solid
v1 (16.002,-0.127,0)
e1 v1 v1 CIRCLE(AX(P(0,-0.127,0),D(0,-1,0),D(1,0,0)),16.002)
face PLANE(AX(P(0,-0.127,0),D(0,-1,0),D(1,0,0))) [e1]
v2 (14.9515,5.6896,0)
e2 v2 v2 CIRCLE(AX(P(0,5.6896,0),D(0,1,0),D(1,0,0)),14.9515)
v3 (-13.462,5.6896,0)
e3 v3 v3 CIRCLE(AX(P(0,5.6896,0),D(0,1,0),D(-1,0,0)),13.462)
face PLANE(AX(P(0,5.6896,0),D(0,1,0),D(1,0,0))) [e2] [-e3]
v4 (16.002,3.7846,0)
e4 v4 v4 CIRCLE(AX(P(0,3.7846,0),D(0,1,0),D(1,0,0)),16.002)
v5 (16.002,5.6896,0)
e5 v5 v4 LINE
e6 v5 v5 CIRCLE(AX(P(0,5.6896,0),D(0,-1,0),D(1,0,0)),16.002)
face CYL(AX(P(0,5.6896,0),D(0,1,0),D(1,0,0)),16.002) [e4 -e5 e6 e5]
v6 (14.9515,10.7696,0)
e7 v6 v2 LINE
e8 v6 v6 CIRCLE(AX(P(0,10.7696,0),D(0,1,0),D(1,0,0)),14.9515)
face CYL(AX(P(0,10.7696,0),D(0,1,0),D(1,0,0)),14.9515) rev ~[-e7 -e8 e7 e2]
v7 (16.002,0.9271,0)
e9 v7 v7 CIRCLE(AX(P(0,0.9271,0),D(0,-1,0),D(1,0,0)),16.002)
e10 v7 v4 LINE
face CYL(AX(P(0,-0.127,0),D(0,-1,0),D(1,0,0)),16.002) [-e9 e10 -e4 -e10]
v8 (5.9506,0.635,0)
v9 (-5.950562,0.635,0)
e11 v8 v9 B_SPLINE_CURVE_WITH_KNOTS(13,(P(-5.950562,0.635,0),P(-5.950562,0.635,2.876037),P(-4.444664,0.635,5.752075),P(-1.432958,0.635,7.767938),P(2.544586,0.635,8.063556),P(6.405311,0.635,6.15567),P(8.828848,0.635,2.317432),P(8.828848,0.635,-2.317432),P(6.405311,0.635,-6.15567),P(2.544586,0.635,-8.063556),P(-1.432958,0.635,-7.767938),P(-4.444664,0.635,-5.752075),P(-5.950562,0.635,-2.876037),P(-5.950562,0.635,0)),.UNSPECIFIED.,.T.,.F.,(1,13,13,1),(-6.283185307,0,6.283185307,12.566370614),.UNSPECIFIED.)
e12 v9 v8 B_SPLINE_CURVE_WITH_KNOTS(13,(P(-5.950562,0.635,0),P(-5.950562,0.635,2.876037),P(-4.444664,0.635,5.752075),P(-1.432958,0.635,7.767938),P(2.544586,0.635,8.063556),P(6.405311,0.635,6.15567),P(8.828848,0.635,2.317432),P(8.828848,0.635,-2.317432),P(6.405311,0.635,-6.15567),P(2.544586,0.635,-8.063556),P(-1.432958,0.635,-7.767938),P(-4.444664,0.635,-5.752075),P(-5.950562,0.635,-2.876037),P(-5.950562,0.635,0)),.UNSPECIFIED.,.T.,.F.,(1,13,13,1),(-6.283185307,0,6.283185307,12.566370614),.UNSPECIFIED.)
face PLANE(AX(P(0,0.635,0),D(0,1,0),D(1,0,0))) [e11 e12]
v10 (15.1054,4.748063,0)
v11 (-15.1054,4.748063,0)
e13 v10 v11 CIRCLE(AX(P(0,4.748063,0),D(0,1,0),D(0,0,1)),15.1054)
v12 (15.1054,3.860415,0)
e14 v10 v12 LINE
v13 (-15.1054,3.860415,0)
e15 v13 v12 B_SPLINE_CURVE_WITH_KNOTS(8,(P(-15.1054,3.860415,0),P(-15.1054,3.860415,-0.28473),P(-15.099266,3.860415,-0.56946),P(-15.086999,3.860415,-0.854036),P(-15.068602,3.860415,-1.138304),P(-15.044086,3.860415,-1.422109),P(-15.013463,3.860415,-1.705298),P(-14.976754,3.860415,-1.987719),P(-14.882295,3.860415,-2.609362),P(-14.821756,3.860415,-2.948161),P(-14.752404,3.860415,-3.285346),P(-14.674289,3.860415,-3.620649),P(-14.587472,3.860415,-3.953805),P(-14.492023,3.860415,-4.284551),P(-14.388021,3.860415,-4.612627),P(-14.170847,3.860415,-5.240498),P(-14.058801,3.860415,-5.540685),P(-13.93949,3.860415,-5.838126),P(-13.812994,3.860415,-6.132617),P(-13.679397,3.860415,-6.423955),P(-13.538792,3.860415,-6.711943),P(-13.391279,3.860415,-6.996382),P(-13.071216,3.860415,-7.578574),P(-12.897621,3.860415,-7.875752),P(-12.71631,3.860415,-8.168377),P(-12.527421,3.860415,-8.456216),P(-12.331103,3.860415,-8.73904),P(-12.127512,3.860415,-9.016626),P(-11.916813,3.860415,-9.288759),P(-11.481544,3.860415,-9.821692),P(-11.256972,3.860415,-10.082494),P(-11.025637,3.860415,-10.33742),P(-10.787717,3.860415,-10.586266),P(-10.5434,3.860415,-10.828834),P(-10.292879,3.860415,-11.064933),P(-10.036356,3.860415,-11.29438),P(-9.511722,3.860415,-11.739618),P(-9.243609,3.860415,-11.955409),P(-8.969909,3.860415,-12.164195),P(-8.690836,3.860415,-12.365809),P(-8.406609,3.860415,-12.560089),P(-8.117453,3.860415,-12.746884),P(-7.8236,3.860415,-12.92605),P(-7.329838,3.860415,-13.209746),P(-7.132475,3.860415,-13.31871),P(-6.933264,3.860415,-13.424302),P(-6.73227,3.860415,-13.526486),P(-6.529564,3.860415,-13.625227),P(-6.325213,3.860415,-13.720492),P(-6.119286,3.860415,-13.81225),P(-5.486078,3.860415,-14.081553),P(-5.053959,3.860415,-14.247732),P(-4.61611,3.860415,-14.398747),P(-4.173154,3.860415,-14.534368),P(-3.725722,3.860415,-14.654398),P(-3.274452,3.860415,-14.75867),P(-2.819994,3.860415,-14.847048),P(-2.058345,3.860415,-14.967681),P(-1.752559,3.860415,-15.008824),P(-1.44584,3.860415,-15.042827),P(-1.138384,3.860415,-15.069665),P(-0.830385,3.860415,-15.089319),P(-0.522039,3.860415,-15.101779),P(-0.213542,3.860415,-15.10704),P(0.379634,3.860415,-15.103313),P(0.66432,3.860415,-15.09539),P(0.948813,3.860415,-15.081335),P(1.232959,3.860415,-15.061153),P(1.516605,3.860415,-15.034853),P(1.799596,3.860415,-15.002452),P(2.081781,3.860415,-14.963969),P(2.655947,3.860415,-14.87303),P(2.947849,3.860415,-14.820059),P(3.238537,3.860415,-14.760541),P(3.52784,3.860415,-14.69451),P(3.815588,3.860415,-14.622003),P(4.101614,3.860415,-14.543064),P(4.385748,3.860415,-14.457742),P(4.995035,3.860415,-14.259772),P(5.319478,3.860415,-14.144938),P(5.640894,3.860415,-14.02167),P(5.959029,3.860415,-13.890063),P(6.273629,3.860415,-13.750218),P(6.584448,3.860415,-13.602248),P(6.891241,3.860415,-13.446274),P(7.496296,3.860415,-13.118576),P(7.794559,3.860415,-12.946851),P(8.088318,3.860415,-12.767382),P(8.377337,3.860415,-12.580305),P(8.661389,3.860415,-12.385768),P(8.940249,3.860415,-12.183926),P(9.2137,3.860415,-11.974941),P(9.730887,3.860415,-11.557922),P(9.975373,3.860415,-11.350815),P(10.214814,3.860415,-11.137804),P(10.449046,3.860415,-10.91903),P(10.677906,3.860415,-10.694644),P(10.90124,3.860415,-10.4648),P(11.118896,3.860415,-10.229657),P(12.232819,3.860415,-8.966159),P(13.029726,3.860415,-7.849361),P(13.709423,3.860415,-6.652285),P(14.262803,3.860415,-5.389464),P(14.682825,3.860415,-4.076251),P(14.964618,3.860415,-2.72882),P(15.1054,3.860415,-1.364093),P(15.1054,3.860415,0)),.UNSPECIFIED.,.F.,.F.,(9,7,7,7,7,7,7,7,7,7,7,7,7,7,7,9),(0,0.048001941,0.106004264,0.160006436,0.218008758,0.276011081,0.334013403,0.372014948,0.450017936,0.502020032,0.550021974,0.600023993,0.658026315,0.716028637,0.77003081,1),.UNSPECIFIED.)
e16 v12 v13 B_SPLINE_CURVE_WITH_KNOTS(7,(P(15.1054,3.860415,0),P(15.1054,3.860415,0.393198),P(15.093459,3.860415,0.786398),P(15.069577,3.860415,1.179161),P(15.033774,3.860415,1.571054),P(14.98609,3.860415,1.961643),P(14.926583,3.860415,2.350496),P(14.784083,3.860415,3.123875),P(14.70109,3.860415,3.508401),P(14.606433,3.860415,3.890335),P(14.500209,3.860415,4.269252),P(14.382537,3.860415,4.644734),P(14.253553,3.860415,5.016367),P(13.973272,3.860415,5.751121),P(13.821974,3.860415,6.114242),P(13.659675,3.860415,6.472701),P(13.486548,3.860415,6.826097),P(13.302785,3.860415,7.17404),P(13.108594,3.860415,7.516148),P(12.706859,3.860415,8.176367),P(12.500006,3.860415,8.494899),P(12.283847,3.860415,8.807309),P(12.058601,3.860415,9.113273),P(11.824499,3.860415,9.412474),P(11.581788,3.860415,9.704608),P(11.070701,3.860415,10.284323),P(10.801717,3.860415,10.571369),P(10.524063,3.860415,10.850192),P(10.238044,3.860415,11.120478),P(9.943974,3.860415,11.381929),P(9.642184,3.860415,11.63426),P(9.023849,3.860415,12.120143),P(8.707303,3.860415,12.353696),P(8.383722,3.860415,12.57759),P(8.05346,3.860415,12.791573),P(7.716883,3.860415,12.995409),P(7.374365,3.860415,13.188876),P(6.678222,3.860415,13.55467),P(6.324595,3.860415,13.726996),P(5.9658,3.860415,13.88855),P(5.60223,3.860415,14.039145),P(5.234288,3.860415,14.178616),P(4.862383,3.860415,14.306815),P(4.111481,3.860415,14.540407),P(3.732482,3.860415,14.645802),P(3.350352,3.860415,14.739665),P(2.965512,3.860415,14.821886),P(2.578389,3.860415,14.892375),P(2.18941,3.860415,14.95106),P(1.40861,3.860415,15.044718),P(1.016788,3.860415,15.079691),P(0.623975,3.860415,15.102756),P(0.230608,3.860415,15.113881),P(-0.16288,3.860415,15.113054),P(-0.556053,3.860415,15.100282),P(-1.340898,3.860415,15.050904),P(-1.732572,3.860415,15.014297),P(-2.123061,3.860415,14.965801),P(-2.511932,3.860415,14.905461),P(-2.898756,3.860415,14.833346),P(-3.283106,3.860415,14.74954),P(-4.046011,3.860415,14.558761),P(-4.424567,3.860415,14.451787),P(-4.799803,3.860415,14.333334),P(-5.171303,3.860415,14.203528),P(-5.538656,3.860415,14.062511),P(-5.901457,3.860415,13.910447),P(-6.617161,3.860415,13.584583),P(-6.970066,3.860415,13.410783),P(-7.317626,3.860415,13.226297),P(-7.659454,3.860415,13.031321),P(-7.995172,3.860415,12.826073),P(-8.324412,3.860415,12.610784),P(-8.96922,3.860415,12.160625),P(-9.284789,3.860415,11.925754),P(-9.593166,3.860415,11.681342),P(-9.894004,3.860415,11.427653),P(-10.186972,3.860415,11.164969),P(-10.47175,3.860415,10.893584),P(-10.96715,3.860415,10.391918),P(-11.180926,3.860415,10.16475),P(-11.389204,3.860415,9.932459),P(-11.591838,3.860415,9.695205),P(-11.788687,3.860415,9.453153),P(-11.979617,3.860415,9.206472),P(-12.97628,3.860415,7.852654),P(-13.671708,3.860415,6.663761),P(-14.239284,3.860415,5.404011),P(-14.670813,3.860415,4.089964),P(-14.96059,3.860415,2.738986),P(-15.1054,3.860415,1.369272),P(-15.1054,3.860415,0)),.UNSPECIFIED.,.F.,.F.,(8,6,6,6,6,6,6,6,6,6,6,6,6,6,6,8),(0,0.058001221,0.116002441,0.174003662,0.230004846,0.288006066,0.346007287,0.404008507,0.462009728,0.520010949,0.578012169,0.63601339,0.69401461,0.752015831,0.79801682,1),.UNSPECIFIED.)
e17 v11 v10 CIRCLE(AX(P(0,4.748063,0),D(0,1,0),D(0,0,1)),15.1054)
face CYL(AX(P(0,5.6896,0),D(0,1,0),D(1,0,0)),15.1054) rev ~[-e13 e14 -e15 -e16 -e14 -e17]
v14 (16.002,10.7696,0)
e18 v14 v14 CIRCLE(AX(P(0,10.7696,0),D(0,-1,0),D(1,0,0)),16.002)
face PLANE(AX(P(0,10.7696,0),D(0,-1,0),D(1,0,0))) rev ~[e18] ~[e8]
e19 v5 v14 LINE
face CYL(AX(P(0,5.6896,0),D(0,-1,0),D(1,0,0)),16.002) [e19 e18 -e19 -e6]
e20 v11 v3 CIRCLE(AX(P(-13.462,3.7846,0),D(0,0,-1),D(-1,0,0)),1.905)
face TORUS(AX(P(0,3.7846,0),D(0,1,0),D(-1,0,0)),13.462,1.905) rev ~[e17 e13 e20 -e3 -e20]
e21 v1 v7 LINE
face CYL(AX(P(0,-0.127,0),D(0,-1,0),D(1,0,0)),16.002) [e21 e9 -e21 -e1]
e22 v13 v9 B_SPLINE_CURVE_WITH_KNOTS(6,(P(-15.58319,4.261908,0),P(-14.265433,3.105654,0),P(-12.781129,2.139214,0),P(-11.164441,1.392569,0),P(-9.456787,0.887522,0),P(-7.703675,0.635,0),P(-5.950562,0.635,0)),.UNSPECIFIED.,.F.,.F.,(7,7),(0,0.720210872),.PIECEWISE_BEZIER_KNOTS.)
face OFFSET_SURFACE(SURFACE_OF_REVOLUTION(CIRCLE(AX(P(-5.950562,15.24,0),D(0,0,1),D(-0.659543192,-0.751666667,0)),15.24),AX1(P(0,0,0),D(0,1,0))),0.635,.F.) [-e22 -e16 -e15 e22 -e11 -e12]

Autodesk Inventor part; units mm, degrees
ref_plane "YZ Plane" through (0, 0, 0) normal (1, 0, 0) x (0, 1, 0)
ref_plane "XZ Plane" through (0, 0, 0) normal (0, 1, 0) x (-1, 0, 0)
ref_plane "XY Plane" through (0, 0, 0) normal (0, 0, 1) x (1, 0, 0)
sketch "Sketch1" plane through (0, 0, 0) normal (0, 1, 0) x (-1, 0, 0)
  circle A0 centre (0, 0) radius 16.002
  dimension "d0" = 32.004
extrude "Extrusion1" add sketch "Sketch1" along normal blind 6.3246
sketch "Sketch2" plane through (0, 6.3246, 0) normal (0, 1, 0) x (1, 0, 0)
  circle A0 centre (0, 0) radius 13.335
  dimension "d3" = 26.67
extrude "Extrusion2" add sketch "Sketch2" along normal blind 1.1176
fillet "Fillet1" radius 2.54 1 edges at (16.002, 6.3246, 0)
fillet "Fillet2" radius 15.24 1 edges at (16.002, 0, 0)
fillet "Fillet3" radius 0.254 1 edges at (-13.335, 7.4422, 0)
shell "Shell1" thickness 0.635 removed faces 3 at (13.1616, 7.2072, 2.139) at (13.2918, 6.9003, 1.073) at (2.477, 7.4422, -4.5655)
sketch "Sketch3" plane through (0, 0.635, 0) normal (0, 1, 0) x (1, 0, 0)
  circle A0 centre (0, 0) radius 5.9506
extrude "Extrusion3" cut sketch "Sketch3" against normal blind 25.4
extrude "Extrusion4" add sketch "Sketch3" against normal blind 0.762
sketch "Sketch5" plane through (0, -0.127, 0) normal (0, -1, 0) x (1, 0, 0)
  circle A0 centre (0, 0) radius 16.002
extrude "Extrusion6" add sketch "Sketch5" against normal up to next
sketch "Sketch7" plane through (0, 5.6896, 0) normal (0, -1, 0) x (1, 0, 0)
  circle A0 centre (0, 0) radius 15.3471
  circle A1 centre (0, 0) radius 16.002
extrude "Extrusion7" add sketch "Sketch7" against normal blind 5.08 contours A0 | A1
sketch "Sketch8" plane through (0, 10.7696, 0) normal (0, 1, 0) x (1, 0, 0)
  circle A0 centre (0, 0) radius 14.9515
extrude "Extrusion8" cut sketch "Sketch8" against normal blind 5.08
sketch "Sketch9" plane through (0, 5.6896, 0) normal (0, -1, 0) x (1, 0, 0)
  circle A0 centre (0, 0) radius 16.002
  circle A1 centre (0, 0) radius 15.1054
extrude "Extrusion9" add sketch "Sketch9" along normal blind 4.7625
sketch "Sketch11" plane through (0, 5.6896, 0) normal (0, 1, 0) x (1, 0, 0)
  circle A0 centre (0, 0) radius 13.462 projected
  arc A1 (0, 13.462) -> (-13.462, 0) centre (0, 0) ccw
  arc A2 (13.462, 0) -> (0, 13.462) centre (0, 0) ccw
  arc A3 (-0.0694, -13.4618) -> (13.462, 0) centre (0, 0) ccw
properties part number "befor"
